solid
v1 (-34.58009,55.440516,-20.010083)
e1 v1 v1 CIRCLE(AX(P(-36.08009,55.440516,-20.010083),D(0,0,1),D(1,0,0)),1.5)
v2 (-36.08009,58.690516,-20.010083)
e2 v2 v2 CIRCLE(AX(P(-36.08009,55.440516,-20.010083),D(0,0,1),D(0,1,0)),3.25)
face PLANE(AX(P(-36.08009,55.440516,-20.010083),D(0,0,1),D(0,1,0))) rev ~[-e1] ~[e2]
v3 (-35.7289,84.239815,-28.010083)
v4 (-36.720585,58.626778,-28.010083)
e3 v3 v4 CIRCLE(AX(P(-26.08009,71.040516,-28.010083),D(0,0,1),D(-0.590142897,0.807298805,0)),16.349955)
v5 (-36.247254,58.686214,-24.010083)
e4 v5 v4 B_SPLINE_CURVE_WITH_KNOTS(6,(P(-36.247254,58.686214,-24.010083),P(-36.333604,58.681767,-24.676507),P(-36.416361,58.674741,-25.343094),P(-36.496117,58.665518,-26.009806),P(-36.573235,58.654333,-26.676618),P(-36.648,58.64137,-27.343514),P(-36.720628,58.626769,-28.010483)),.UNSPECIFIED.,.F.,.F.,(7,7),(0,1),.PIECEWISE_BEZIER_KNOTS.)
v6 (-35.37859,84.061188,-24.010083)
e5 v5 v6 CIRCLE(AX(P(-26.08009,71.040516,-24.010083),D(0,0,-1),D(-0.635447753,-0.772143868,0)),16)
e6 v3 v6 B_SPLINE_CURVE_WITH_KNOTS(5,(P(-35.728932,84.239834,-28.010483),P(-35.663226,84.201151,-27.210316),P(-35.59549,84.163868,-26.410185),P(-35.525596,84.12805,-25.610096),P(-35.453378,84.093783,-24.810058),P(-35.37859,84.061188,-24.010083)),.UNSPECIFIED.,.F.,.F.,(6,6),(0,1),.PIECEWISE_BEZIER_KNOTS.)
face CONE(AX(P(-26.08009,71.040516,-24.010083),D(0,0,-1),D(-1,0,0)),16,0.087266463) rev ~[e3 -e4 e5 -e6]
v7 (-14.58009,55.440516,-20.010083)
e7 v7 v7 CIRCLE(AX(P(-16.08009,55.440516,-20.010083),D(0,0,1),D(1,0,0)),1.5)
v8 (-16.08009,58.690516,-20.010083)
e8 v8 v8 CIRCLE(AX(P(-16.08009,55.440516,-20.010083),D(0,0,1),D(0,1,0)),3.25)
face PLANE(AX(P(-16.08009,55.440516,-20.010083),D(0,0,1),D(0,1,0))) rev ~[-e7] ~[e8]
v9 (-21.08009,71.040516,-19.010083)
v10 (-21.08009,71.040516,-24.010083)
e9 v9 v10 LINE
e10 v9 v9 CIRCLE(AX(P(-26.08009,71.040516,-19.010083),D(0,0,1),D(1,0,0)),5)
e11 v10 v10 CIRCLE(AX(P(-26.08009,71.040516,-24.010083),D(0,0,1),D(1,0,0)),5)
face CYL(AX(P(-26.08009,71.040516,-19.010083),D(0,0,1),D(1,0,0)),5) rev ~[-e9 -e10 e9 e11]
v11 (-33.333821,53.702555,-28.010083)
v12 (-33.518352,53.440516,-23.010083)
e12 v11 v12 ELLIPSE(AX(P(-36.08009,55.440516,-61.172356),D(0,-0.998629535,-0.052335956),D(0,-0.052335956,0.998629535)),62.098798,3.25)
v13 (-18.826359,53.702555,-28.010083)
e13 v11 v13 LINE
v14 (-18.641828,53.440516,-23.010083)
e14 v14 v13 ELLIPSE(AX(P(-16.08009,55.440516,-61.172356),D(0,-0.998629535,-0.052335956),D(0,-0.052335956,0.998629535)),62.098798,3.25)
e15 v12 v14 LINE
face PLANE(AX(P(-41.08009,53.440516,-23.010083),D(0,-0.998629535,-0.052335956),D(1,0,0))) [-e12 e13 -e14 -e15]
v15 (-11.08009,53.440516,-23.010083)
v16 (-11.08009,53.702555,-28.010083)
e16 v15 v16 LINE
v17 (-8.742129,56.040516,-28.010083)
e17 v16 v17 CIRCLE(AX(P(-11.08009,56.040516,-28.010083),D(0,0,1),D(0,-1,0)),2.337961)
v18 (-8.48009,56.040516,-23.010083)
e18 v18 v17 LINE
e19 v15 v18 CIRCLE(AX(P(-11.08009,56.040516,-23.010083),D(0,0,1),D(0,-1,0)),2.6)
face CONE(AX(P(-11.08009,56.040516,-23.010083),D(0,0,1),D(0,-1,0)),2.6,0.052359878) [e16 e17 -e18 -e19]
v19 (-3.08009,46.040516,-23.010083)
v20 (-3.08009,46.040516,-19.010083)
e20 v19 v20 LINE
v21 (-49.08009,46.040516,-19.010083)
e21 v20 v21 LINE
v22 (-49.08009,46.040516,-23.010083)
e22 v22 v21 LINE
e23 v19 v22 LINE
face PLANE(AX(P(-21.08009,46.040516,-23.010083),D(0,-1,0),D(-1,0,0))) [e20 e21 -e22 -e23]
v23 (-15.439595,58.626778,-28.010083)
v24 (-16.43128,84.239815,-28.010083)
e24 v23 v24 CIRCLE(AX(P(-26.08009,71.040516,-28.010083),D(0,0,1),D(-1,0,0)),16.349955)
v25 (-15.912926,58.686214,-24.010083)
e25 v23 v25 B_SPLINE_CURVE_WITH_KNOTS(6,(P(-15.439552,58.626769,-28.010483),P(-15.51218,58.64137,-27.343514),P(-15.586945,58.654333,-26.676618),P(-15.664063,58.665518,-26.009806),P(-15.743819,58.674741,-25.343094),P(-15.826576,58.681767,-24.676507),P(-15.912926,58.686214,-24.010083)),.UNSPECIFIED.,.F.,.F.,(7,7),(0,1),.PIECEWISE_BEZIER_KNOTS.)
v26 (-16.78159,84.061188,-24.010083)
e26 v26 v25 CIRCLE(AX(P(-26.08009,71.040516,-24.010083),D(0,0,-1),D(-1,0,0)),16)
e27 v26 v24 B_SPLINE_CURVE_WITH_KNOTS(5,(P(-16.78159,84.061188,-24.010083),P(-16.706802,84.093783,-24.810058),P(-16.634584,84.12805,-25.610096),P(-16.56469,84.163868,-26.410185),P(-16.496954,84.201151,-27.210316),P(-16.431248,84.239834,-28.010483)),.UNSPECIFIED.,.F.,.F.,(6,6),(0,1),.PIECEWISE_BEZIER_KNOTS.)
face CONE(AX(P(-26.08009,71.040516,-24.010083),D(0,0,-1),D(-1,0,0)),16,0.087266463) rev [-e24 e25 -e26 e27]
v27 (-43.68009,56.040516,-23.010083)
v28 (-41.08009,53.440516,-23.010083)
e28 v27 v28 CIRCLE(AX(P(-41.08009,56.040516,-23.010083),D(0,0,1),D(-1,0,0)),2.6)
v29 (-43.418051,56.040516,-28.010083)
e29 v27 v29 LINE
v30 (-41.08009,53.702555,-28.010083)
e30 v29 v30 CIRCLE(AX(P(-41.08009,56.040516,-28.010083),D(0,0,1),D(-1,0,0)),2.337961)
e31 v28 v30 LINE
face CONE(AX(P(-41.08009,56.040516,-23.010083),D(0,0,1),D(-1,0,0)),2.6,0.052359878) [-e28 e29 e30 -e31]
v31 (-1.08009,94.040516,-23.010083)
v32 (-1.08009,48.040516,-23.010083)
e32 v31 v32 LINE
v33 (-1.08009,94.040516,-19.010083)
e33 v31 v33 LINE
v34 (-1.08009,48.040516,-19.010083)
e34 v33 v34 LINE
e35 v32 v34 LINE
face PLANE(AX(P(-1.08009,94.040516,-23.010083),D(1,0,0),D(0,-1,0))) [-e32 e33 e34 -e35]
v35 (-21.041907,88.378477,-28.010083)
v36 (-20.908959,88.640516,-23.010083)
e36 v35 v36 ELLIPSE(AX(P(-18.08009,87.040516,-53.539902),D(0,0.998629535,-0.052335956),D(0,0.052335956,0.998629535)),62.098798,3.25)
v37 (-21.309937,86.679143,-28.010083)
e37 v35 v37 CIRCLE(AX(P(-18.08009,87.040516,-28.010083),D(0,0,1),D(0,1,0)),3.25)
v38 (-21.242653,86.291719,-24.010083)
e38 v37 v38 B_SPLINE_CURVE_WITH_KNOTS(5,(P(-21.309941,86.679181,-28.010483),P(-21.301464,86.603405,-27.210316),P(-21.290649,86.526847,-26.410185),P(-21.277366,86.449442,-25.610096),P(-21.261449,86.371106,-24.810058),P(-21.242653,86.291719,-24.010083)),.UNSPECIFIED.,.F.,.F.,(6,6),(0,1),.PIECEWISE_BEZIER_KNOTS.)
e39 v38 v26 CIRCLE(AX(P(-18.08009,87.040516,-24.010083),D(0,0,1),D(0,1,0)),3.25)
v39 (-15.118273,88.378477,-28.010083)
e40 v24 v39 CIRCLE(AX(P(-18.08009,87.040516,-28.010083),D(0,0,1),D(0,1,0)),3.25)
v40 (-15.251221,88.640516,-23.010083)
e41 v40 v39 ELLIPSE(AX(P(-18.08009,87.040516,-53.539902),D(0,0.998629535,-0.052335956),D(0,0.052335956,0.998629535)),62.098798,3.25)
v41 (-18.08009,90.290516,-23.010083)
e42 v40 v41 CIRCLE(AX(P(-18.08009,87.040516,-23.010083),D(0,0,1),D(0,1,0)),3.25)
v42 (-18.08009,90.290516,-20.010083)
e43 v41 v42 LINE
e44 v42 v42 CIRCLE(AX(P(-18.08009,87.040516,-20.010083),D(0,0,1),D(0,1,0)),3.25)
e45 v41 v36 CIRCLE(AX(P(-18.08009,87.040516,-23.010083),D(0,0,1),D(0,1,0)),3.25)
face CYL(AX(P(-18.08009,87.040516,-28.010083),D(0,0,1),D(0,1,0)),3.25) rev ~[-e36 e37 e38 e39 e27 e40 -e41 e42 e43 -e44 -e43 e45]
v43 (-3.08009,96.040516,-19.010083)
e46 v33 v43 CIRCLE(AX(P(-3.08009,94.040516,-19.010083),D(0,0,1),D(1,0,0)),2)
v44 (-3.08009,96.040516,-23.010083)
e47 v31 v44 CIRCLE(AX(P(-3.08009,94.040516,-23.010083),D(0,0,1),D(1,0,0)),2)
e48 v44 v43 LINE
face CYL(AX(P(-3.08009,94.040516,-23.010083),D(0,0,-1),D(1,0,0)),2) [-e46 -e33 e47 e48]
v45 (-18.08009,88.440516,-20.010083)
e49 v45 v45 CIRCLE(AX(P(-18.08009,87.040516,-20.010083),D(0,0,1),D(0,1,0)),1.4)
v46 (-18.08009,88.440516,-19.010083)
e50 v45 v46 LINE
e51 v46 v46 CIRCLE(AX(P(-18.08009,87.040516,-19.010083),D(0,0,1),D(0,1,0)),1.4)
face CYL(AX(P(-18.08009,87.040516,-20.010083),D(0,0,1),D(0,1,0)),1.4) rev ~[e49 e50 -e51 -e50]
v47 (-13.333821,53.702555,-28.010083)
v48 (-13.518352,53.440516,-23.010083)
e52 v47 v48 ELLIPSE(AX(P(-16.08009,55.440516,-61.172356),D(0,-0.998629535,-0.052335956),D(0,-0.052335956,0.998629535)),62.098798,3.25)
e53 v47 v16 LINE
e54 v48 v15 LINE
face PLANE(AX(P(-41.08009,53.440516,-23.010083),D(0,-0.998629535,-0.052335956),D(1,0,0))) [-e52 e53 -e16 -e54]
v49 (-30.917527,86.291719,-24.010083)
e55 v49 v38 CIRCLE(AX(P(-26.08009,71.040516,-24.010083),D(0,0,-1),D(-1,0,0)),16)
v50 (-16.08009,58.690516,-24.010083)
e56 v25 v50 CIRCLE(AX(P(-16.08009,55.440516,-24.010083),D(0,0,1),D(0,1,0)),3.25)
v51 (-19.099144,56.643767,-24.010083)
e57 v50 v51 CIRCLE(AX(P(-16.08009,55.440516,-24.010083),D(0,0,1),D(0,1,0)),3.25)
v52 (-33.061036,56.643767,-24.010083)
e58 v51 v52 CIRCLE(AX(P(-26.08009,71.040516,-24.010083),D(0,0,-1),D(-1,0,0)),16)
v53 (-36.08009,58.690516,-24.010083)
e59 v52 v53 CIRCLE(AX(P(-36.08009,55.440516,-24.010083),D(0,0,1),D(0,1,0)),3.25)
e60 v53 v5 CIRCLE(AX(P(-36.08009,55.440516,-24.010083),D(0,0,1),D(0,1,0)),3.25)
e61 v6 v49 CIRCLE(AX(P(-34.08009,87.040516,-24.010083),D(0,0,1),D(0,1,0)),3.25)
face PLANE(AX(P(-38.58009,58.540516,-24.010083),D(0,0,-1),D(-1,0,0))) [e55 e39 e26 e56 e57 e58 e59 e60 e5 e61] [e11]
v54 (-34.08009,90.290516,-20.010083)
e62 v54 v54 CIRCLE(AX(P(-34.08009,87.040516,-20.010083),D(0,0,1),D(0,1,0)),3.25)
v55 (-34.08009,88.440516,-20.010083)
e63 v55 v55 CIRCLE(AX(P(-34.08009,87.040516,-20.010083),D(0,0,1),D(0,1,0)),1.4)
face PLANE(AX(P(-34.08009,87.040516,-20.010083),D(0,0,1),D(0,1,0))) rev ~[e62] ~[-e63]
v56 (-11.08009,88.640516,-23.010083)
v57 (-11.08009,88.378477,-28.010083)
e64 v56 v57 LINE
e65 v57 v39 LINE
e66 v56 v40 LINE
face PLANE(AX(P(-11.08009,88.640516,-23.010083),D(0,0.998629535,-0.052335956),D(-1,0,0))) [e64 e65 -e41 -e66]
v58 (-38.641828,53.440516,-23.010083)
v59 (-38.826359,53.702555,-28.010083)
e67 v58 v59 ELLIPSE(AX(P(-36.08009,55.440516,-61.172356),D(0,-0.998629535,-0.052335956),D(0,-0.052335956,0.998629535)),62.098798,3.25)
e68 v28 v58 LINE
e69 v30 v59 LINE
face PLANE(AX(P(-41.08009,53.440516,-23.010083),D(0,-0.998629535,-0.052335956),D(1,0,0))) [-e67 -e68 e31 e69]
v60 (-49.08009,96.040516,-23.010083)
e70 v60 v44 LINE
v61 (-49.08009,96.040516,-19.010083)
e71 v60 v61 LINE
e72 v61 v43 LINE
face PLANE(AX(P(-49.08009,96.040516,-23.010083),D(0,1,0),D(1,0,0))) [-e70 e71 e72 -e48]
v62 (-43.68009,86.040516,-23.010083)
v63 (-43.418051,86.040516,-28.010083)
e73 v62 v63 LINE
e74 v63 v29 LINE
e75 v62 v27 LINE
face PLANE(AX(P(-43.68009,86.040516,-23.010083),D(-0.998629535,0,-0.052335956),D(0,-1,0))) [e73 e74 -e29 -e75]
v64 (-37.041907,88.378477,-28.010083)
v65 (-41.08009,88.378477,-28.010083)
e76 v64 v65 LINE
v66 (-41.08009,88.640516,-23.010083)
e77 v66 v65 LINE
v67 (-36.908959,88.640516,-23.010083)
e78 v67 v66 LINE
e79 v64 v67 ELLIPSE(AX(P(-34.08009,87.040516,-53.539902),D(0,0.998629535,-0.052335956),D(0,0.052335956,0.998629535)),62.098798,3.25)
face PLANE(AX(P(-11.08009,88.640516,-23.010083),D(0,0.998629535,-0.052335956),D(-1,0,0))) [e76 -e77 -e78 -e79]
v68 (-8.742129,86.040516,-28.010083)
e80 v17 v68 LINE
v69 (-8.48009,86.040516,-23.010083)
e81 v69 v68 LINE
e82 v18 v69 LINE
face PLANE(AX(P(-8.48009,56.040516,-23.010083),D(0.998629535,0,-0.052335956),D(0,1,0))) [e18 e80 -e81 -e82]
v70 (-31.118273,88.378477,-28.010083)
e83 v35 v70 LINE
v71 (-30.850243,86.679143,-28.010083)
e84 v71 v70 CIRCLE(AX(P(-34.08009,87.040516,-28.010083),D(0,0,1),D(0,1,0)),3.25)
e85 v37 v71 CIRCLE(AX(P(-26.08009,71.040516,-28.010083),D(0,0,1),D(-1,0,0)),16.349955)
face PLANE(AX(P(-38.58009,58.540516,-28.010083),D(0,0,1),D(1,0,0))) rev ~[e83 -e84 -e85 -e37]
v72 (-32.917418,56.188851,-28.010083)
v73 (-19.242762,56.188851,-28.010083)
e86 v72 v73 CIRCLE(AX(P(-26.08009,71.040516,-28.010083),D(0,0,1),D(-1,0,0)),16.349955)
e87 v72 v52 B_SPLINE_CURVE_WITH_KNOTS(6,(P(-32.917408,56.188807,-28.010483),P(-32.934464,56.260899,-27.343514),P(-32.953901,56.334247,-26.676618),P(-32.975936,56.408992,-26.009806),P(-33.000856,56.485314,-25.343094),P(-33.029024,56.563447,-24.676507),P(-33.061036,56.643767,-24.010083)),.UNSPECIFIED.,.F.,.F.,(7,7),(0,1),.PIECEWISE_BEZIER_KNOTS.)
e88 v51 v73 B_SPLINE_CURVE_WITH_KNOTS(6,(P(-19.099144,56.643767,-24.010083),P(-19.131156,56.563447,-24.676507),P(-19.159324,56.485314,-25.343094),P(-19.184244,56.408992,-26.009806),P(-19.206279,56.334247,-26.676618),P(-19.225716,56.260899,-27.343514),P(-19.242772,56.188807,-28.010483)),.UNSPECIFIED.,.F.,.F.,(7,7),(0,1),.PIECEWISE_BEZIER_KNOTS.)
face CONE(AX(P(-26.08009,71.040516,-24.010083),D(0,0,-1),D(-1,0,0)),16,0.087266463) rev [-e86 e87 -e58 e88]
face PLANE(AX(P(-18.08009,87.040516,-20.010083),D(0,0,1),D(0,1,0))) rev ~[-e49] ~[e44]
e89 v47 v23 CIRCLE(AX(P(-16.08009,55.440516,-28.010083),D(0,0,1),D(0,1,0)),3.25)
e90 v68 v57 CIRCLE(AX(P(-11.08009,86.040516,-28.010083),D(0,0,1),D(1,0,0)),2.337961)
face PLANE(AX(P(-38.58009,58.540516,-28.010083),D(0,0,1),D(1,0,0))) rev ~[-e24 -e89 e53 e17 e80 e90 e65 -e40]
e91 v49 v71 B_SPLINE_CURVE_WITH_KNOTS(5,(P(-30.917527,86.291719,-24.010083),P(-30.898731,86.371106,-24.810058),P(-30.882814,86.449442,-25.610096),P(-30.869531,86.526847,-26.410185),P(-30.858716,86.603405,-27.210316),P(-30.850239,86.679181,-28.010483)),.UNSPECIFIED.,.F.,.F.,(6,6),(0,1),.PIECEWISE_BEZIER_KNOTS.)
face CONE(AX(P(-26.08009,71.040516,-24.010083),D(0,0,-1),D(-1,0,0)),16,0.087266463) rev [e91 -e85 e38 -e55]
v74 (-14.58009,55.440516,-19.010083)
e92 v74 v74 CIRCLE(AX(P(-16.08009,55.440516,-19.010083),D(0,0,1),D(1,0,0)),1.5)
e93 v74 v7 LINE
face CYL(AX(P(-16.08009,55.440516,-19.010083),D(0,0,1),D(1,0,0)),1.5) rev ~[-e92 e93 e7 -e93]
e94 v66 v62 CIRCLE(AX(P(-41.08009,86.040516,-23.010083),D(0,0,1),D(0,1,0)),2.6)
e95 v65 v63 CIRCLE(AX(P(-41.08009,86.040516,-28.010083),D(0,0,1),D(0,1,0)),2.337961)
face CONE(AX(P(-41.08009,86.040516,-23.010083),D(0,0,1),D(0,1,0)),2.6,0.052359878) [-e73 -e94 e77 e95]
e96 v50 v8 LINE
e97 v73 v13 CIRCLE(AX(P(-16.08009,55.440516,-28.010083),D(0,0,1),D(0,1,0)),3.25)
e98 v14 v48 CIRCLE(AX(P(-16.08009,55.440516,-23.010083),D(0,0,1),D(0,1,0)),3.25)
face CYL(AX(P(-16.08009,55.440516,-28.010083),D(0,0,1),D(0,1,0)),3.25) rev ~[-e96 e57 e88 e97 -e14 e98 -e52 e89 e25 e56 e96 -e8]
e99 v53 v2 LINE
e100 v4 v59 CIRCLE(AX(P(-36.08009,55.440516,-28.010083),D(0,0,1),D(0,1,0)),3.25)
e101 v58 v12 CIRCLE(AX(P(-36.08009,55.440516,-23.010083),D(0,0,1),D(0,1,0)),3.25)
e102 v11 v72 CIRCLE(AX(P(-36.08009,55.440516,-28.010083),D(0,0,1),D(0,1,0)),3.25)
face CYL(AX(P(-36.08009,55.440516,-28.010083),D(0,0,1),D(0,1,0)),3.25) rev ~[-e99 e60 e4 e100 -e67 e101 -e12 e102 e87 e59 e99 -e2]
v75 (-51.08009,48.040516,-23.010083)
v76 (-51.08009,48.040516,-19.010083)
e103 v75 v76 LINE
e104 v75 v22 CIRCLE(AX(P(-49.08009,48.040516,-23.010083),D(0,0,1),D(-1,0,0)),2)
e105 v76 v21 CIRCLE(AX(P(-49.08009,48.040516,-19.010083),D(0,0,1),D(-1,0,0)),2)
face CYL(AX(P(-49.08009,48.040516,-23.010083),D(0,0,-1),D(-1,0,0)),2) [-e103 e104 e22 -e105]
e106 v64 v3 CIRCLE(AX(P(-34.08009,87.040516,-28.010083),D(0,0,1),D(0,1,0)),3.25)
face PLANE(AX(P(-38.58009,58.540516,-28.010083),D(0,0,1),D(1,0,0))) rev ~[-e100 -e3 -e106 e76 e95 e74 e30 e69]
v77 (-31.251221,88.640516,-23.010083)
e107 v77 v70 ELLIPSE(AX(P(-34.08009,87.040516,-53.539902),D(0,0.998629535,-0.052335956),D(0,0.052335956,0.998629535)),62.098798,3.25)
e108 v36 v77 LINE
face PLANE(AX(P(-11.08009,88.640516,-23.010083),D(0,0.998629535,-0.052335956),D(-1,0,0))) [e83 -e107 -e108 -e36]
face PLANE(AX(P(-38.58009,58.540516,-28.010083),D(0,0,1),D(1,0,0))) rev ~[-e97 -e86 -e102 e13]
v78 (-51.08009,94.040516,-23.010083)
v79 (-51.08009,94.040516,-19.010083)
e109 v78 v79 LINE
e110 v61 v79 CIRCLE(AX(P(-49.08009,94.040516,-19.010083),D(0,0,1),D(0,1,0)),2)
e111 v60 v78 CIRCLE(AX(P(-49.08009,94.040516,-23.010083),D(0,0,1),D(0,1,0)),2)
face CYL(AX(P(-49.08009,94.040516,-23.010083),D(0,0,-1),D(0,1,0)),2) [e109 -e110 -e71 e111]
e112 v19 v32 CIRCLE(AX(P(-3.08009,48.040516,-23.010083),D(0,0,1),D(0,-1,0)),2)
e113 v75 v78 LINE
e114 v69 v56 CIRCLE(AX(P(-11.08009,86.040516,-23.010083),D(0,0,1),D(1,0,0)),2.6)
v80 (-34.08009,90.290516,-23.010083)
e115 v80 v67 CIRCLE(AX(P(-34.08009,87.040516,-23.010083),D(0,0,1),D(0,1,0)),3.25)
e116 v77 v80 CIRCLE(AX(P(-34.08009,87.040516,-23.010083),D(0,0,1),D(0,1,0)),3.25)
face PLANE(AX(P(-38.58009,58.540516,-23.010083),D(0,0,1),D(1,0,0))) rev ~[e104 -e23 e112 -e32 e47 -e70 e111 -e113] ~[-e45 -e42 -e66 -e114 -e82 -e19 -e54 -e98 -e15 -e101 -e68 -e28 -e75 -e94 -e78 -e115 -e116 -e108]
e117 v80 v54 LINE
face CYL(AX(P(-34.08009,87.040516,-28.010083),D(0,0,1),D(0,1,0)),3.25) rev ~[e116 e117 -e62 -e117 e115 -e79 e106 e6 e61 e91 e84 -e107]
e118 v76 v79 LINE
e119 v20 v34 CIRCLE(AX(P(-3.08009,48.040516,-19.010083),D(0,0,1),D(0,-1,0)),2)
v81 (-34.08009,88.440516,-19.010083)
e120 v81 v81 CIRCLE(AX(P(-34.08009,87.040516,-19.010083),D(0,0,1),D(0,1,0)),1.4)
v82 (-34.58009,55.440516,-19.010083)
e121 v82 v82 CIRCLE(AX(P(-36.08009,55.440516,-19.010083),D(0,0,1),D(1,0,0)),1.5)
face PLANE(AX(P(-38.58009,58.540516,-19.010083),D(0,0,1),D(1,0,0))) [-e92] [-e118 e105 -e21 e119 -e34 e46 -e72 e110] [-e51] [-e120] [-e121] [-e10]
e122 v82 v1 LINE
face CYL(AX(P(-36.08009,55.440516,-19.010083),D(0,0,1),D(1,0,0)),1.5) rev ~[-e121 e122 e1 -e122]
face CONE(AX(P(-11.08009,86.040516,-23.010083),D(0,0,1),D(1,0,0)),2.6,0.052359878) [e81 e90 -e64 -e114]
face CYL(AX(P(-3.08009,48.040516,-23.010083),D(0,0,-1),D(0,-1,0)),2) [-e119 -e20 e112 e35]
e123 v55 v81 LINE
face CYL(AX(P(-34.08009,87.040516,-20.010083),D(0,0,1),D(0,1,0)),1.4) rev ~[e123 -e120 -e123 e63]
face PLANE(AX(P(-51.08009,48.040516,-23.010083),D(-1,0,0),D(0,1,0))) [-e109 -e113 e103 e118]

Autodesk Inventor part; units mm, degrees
ref_plane "YZ Plane" through (0, 0, 0) normal (1, 0, 0) x (0, 1, 0)
ref_plane "XZ Plane" through (0, 0, 0) normal (0, 1, 0) x (-1, 0, 0)
ref_plane "XY Plane" through (0, 0, 0) normal (0, 0, 1) x (1, 0, 0)
ref_plane "Arbeitsebene15" through (-38.58009, 58.540516, -23.010083) normal (0, 0, 1) x (1, 0, 0)
sketch "Skizze38" plane through (-38.58009, 58.540516, -23.010083) normal (0, 0, 1) x (1, 0, 0)
  circle A0 centre (27, 33.3) radius 3
  circle A1 centre (-8.3, 27) radius 3
  circle A2 centre (-2, -8.3) radius 3
  circle A3 centre (33.3, -2) radius 3
  circle A4 centre (27, -8.3) radius 3
  circle A5 centre (-8.3, -2) radius 3
  circle A6 centre (-2, 33.3) radius 3
  circle A7 centre (33.3, 27) radius 3
  line L0 (27.5, 29.5) -> (-2.5, 29.5)
  arc A8 (29.5, 27.5) -> (27.5, 29.5) centre (27.5, 27.5) ccw
  line L1 (29.5, 27.5) -> (29.5, -2.5)
  arc A9 (27.5, -4.5) -> (29.5, -2.5) centre (27.5, -2.5) ccw
  line L2 (-2.5, -4.5) -> (27.5, -4.5)
  arc A10 (-4.5, -2.5) -> (-2.5, -4.5) centre (-2.5, -2.5) ccw
  line L3 (-4.5, -2.5) -> (-4.5, 27.5)
  arc A11 (-2.5, 29.5) -> (-4.5, 27.5) centre (-2.5, 27.5) ccw
  circle A12 centre (33.5, 33.5) radius 2.5
  circle A13 centre (-8.5, -8.5) radius 2.5
  circle A14 centre (33.5, -8.5) radius 2.5
  circle A15 centre (-8.5, 33.5) radius 2.5
  line L4 (-11.75, -10.5) -> (-11.75, 8.25)
  arc A16 (-11.75, -10.5) -> (-10.5, -11.75) centre (-10.5, -10.5) ccw
  line L5 (8.25, -11.75) -> (-10.5, -11.75)
  line L6 (8.25, -13.877389) -> (8.25, -11.75)
  arc A17 (7.405556, -14.865216) -> (8.25, -13.877389) centre (7.25, -13.877389) ccw
  arc A18 (7.405556, -14.865216) -> (7.6, -17.35) centre (7.6, -16.1) ccw
  line L7 (17.4, -17.35) -> (7.6, -17.35)
  arc A19 (17.4, -17.35) -> (17.594444, -14.865216) centre (17.4, -16.1) ccw
  arc A20 (16.75, -13.877389) -> (17.594444, -14.865216) centre (17.75, -13.877389) ccw
  line L8 (16.75, -11.75) -> (16.75, -13.877389)
  line L9 (35.5, -11.75) -> (16.75, -11.75)
  arc A21 (35.5, -11.75) -> (36.75, -10.5) centre (35.5, -10.5) ccw
  line L10 (36.75, 6.487451) -> (36.75, -10.5)
  arc A22 (36.75, 6.487451) -> (36.55605, 6.521706) centre (36.65, 6.487451) ccw
  arc A23 (31.3, 7.45) -> (36.55605, 6.521706) centre (34.01, 7.45) ccw
  line L11 (31.3, 17.55) -> (31.3, 7.45)
  arc A24 (36.55605, 18.478294) -> (31.3, 17.55) centre (34.01, 17.55) ccw
  arc A25 (36.55605, 18.478294) -> (36.75, 18.512549) centre (36.65, 18.512549) ccw
  line L12 (36.75, 35.5) -> (36.75, 18.512549)
  arc A26 (36.75, 35.5) -> (35.5, 36.75) centre (35.5, 35.5) ccw
  line L13 (18.512549, 36.75) -> (35.5, 36.75)
  arc A27 (18.512549, 36.75) -> (18.478294, 36.55605) centre (18.512549, 36.65) ccw
  arc A28 (17.55, 31.3) -> (18.478294, 36.55605) centre (17.55, 34.01) ccw
  line L14 (7.45, 31.3) -> (17.55, 31.3)
  arc A29 (6.521706, 36.55605) -> (7.45, 31.3) centre (7.45, 34.01) ccw
  arc A30 (6.521706, 36.55605) -> (6.487451, 36.75) centre (6.487451, 36.65) ccw
  line L15 (-10.5, 36.75) -> (6.487451, 36.75)
  arc A31 (-10.5, 36.75) -> (-11.75, 35.5) centre (-10.5, 35.5) ccw
  line L16 (-11.75, 16.75) -> (-11.75, 35.5)
  line L17 (-13.877389, 16.75) -> (-11.75, 16.75)
  arc A32 (-14.865216, 17.594444) -> (-13.877389, 16.75) centre (-13.877389, 17.75) ccw
  arc A33 (-14.865216, 17.594444) -> (-17.35, 17.4) centre (-16.1, 17.4) ccw
  line L18 (-17.35, 7.6) -> (-17.35, 17.4)
  arc A34 (-17.35, 7.6) -> (-14.865216, 7.405556) centre (-16.1, 7.6) ccw
  arc A35 (-13.877389, 8.25) -> (-14.865216, 7.405556) centre (-13.877389, 7.25) ccw
  line L19 (-11.75, 8.25) -> (-13.877389, 8.25)
  line L20 (-2.5, 30.1) -> (27.5, 30.1)
  arc A36 (30.1, 27.5) -> (27.5, 30.1) centre (27.5, 27.5) ccw
  line L21 (30.1, 27.5) -> (30.1, -2.5)
  arc A37 (27.5, -5.1) -> (30.1, -2.5) centre (27.5, -2.5) ccw
  line L22 (27.5, -5.1) -> (-2.5, -5.1)
  arc A38 (-5.1, -2.5) -> (-2.5, -5.1) centre (-2.5, -2.5) ccw
  line L23 (-5.1, -2.5) -> (-5.1, 27.5)
  arc A39 (-2.5, 30.1) -> (-5.1, 27.5) centre (-2.5, 27.5) ccw
  point P0 (38.58009, -58.540516)
  dimension "d425" = 0.6
sketch "Skizze38 outline for Extrusion20" plane through (-38.58009, 58.540516, -23.010083) normal (0, 0, 1) x (1, 0, 0)
  arc A0 (-5.1, -2.5) -> (-2.5, -5.1) centre (-2.5, -2.5) ccw
  line L0 (-5.1, 27.5) -> (-5.1, -2.5)
  arc A1 (-2.5, 30.1) -> (-5.1, 27.5) centre (-2.5, 27.5) ccw
  line L1 (27.5, 30.1) -> (-2.5, 30.1)
  arc A2 (30.1, 27.5) -> (27.5, 30.1) centre (27.5, 27.5) ccw
  line L2 (30.1, -2.5) -> (30.1, 27.5)
  arc A3 (27.5, -5.1) -> (30.1, -2.5) centre (27.5, -2.5) ccw
  line L3 (-2.5, -5.1) -> (27.5, -5.1)
extrude "Extrusion20" add sketch "Skizze38 outline for Extrusion20" against normal blind 5 draft -3
sketch "Skizze39" plane through (-38.58009, 58.540516, -23.010083) normal (0, 0, 1) x (1, 0, 0)
  line L0 (-2.5, -5.1) -> (27.5, -5.1) projected
  arc A0 (27.5, -5.1) -> (30.1, -2.5) centre (27.5, -2.5) ccw projected
  line L1 (30.1, -2.5) -> (30.1, 27.5) projected
  arc A1 (30.1, 27.5) -> (27.5, 30.1) centre (27.5, 27.5) ccw projected
  line L2 (27.5, 30.1) -> (-2.5, 30.1) projected
  arc A2 (-2.5, 30.1) -> (-5.1, 27.5) centre (-2.5, 27.5) ccw projected
  line L3 (-5.1, 27.5) -> (-5.1, -2.5) projected
  arc A3 (-5.1, -2.5) -> (-2.5, -5.1) centre (-2.5, -2.5) ccw projected
  line L4 (17.5, -12.5) -> (35.5, -12.5) projected
  line L5 (-10.5, 37.5) -> (35.5, 37.5)
  line L6 (37.5, 35.5) -> (37.5, -10.5)
  line L7 (35.5, -12.5) -> (-10.5, -12.5)
  line L8 (-12.5, -10.5) -> (-12.5, 35.5)
  line L9 (-12.5, 37.5) -> (37.5, -12.5) construction
  line L10 (37.5, 37.5) -> (-12.5, -12.5) construction
  arc A4 (37.5, 35.5) -> (35.5, 37.5) centre (35.5, 35.5) ccw projected
  arc A5 (37.5, 35.5) -> (35.5, 37.5) centre (35.5, 35.5) ccw
  arc A6 (-10.5, 37.5) -> (-12.5, 35.5) centre (-10.5, 35.5) ccw
  arc A7 (-12.5, -10.5) -> (-10.5, -12.5) centre (-10.5, -10.5) ccw
  arc A8 (35.5, -12.5) -> (37.5, -10.5) centre (35.5, -10.5) ccw
  point P0 (38.58009, -58.540516)
  point P1 (12.5, 12.5)
  point P2 (35.5, -12.5)
  dimension "d428" = 50
  dimension "d429" = 50
  dimension "d430" = 2
extrude "Extrusion21" add sketch "Skizze39" along normal blind 4 contours A3 L3 A2 L2 A1 L1 A0 L0 | L7 A7 L8 A6 L5 A4 L6 A8 L4
sketch "Skizze40" plane through (-38.58009, 58.540516, -19.010083) normal (0, 0, 1) x (1, 0, 0)
  arc A0 (-10.5, 37.5) -> (-12.5, 35.5) centre (-10.5, 35.5) ccw projected
  line L0 (-12.5, 35.5) -> (-12.5, -10.5) projected
  arc A1 (-12.5, -10.5) -> (-10.5, -12.5) centre (-10.5, -10.5) ccw projected
  line L1 (-10.5, -12.5) -> (35.5, -12.5) projected
  arc A2 (35.5, -12.5) -> (37.5, -10.5) centre (35.5, -10.5) ccw projected
  line L2 (37.5, -10.5) -> (37.5, 35.5) projected
  arc A3 (37.5, 35.5) -> (35.5, 37.5) centre (35.5, 35.5) ccw projected
  line L3 (35.5, 37.5) -> (-10.5, 37.5) projected
  circle A4 centre (12.5, 12.5) radius 5
  line L4 (-2.5, 20) -> (27.5, 20) construction
  line L5 (27.5, 20) -> (27.5, -8) construction
  line L6 (27.5, -8) -> (-2.5, -8) construction
  line L7 (-2.5, -8) -> (-2.5, 20) construction
  circle A5 centre (2.5, -3.1) radius 1.5
  circle A6 centre (22.5, -3.1) radius 1.5
  point P0 (38.58009, -58.540516)
  dimension "d433" = 10
  dimension "d434" = 30
  dimension "d435" = 28
  dimension "d436" = 15
  dimension "d437" = 25
  dimension "d438" = 25
  dimension "d439" = 7.5
  dimension "d440" = 3
  dimension "d441" = 3
  dimension "d442" = 5
  dimension "d443" = 5
  dimension "d466" = 15.6
  dimension "d467" = 15.6
extrude "Extrusion22" cut sketch "Skizze40" against normal through all contours A4 | A5 | A6
sketch "Skizze41" plane through (-38.58009, 58.540516, -28.010083) normal (0, 0, -1) x (-1, 0, 0)
  circle A0 centre (-12.5, 12.5) radius 5 projected
  circle A1 centre (-4.5, 28.5) radius 1.4
  circle A2 centre (-20.5, 28.5) radius 1.4
  circle A3 centre (-2.5, -3.1) radius 1.5 projected
  circle A4 centre (-22.5, -3.1) radius 1.5 projected
  point P0 (-38.58009, -58.540516)
  point P1 (-3.17813, -4.837961)
  point P2 (-1.82187, -4.837961)
  point P3 (-23.17813, -4.837961)
  point P4 (-21.82187, -4.837961)
  dimension "d456" = 2.8
  dimension "d457" = 2.8
  dimension "d458" = 16
  dimension "d459" = 16
  dimension "d460" = 8
  dimension "d461" = 8
hole "Bohrung10" at (-34.08009, 87.040516, -28.010083) at (-18.08009, 87.040516, -28.010083) at (-36.08009, 55.440516, -28.010083) at (-16.08009, 55.440516, -28.010083) direction (0, 0, 1) diameter 2.8 end through all counterbore diameter 6.5 counterbore depth 8
ref_plane "Arbeitsebene16" through (-38.58009, 58.540516, -24.010083) normal (0, 0, -1) x (-1, 0, 0)
sketch "Skizze44" plane through (-38.58009, 58.540516, -24.010083) normal (0, 0, -1) x (-1, 0, 0)
  circle A0 centre (-12.5, 12.5) radius 5 projected
  circle A1 centre (-12.5, 12.5) radius 16
  point P0 (-38.58009, -58.540516)
  dimension "d472" = 32
extrude "Extrusion25" cut sketch "Skizze44" along normal through all draft 5 contours A0 | A1
equation "\"d_i\" = 40"
equation "\"d_o\" = 40"
equation "\"d_part\" = 50"
equation "\"d6\" = 0"
equation "\"d7\" = 0"
equation "\"d8\" = 0"
equation "\"d9\" = 0"
equation "\"d13\" = 0"
equation "\"d14\" = 0"
equation "\"d20\" = 0"
equation "\"d21\" = 0"
equation "\"d22\" = 0"
equation "\"d23\" = 0"
equation "\"d24\" = 0"
equation "\"d25\" = 3"
equation "\"d26\" = 0"
equation "\"d27\" = 0"
equation "\"d28\" = 0"
equation "\"d29\" = 0"
equation "\"d30\" = 0"
equation "\"d31\" = 0"
equation "\"d32\" = 0"
equation "\"d33\" = 0"
equation "\"d34\" = 0"
equation "\"d46\" = 0"
equation "\"d47\" = 0"
equation "\"d48\" = 0"
equation "\"d50\" = 0"
equation "\"d51\" = 0"
equation "\"d52\" = 0"
equation "\"d53\" = 0"
equation "\"d54\" = 0"
equation "\"d55\" = 0"
equation "\"d56\" = 0"
equation "\"d57\" = 0"
equation "\"d58\" = 0"
equation "\"d59\" = 0"
equation "\"magnet_offset\" = 0"
equation "\"screw_offset\" = 0"
equation "\"mal_puzzle_offset\" = 0"
equation "\"fem_puzzle_offset\" = 0"
properties part number "20_Cube_Adapter_Zstage_manual"
